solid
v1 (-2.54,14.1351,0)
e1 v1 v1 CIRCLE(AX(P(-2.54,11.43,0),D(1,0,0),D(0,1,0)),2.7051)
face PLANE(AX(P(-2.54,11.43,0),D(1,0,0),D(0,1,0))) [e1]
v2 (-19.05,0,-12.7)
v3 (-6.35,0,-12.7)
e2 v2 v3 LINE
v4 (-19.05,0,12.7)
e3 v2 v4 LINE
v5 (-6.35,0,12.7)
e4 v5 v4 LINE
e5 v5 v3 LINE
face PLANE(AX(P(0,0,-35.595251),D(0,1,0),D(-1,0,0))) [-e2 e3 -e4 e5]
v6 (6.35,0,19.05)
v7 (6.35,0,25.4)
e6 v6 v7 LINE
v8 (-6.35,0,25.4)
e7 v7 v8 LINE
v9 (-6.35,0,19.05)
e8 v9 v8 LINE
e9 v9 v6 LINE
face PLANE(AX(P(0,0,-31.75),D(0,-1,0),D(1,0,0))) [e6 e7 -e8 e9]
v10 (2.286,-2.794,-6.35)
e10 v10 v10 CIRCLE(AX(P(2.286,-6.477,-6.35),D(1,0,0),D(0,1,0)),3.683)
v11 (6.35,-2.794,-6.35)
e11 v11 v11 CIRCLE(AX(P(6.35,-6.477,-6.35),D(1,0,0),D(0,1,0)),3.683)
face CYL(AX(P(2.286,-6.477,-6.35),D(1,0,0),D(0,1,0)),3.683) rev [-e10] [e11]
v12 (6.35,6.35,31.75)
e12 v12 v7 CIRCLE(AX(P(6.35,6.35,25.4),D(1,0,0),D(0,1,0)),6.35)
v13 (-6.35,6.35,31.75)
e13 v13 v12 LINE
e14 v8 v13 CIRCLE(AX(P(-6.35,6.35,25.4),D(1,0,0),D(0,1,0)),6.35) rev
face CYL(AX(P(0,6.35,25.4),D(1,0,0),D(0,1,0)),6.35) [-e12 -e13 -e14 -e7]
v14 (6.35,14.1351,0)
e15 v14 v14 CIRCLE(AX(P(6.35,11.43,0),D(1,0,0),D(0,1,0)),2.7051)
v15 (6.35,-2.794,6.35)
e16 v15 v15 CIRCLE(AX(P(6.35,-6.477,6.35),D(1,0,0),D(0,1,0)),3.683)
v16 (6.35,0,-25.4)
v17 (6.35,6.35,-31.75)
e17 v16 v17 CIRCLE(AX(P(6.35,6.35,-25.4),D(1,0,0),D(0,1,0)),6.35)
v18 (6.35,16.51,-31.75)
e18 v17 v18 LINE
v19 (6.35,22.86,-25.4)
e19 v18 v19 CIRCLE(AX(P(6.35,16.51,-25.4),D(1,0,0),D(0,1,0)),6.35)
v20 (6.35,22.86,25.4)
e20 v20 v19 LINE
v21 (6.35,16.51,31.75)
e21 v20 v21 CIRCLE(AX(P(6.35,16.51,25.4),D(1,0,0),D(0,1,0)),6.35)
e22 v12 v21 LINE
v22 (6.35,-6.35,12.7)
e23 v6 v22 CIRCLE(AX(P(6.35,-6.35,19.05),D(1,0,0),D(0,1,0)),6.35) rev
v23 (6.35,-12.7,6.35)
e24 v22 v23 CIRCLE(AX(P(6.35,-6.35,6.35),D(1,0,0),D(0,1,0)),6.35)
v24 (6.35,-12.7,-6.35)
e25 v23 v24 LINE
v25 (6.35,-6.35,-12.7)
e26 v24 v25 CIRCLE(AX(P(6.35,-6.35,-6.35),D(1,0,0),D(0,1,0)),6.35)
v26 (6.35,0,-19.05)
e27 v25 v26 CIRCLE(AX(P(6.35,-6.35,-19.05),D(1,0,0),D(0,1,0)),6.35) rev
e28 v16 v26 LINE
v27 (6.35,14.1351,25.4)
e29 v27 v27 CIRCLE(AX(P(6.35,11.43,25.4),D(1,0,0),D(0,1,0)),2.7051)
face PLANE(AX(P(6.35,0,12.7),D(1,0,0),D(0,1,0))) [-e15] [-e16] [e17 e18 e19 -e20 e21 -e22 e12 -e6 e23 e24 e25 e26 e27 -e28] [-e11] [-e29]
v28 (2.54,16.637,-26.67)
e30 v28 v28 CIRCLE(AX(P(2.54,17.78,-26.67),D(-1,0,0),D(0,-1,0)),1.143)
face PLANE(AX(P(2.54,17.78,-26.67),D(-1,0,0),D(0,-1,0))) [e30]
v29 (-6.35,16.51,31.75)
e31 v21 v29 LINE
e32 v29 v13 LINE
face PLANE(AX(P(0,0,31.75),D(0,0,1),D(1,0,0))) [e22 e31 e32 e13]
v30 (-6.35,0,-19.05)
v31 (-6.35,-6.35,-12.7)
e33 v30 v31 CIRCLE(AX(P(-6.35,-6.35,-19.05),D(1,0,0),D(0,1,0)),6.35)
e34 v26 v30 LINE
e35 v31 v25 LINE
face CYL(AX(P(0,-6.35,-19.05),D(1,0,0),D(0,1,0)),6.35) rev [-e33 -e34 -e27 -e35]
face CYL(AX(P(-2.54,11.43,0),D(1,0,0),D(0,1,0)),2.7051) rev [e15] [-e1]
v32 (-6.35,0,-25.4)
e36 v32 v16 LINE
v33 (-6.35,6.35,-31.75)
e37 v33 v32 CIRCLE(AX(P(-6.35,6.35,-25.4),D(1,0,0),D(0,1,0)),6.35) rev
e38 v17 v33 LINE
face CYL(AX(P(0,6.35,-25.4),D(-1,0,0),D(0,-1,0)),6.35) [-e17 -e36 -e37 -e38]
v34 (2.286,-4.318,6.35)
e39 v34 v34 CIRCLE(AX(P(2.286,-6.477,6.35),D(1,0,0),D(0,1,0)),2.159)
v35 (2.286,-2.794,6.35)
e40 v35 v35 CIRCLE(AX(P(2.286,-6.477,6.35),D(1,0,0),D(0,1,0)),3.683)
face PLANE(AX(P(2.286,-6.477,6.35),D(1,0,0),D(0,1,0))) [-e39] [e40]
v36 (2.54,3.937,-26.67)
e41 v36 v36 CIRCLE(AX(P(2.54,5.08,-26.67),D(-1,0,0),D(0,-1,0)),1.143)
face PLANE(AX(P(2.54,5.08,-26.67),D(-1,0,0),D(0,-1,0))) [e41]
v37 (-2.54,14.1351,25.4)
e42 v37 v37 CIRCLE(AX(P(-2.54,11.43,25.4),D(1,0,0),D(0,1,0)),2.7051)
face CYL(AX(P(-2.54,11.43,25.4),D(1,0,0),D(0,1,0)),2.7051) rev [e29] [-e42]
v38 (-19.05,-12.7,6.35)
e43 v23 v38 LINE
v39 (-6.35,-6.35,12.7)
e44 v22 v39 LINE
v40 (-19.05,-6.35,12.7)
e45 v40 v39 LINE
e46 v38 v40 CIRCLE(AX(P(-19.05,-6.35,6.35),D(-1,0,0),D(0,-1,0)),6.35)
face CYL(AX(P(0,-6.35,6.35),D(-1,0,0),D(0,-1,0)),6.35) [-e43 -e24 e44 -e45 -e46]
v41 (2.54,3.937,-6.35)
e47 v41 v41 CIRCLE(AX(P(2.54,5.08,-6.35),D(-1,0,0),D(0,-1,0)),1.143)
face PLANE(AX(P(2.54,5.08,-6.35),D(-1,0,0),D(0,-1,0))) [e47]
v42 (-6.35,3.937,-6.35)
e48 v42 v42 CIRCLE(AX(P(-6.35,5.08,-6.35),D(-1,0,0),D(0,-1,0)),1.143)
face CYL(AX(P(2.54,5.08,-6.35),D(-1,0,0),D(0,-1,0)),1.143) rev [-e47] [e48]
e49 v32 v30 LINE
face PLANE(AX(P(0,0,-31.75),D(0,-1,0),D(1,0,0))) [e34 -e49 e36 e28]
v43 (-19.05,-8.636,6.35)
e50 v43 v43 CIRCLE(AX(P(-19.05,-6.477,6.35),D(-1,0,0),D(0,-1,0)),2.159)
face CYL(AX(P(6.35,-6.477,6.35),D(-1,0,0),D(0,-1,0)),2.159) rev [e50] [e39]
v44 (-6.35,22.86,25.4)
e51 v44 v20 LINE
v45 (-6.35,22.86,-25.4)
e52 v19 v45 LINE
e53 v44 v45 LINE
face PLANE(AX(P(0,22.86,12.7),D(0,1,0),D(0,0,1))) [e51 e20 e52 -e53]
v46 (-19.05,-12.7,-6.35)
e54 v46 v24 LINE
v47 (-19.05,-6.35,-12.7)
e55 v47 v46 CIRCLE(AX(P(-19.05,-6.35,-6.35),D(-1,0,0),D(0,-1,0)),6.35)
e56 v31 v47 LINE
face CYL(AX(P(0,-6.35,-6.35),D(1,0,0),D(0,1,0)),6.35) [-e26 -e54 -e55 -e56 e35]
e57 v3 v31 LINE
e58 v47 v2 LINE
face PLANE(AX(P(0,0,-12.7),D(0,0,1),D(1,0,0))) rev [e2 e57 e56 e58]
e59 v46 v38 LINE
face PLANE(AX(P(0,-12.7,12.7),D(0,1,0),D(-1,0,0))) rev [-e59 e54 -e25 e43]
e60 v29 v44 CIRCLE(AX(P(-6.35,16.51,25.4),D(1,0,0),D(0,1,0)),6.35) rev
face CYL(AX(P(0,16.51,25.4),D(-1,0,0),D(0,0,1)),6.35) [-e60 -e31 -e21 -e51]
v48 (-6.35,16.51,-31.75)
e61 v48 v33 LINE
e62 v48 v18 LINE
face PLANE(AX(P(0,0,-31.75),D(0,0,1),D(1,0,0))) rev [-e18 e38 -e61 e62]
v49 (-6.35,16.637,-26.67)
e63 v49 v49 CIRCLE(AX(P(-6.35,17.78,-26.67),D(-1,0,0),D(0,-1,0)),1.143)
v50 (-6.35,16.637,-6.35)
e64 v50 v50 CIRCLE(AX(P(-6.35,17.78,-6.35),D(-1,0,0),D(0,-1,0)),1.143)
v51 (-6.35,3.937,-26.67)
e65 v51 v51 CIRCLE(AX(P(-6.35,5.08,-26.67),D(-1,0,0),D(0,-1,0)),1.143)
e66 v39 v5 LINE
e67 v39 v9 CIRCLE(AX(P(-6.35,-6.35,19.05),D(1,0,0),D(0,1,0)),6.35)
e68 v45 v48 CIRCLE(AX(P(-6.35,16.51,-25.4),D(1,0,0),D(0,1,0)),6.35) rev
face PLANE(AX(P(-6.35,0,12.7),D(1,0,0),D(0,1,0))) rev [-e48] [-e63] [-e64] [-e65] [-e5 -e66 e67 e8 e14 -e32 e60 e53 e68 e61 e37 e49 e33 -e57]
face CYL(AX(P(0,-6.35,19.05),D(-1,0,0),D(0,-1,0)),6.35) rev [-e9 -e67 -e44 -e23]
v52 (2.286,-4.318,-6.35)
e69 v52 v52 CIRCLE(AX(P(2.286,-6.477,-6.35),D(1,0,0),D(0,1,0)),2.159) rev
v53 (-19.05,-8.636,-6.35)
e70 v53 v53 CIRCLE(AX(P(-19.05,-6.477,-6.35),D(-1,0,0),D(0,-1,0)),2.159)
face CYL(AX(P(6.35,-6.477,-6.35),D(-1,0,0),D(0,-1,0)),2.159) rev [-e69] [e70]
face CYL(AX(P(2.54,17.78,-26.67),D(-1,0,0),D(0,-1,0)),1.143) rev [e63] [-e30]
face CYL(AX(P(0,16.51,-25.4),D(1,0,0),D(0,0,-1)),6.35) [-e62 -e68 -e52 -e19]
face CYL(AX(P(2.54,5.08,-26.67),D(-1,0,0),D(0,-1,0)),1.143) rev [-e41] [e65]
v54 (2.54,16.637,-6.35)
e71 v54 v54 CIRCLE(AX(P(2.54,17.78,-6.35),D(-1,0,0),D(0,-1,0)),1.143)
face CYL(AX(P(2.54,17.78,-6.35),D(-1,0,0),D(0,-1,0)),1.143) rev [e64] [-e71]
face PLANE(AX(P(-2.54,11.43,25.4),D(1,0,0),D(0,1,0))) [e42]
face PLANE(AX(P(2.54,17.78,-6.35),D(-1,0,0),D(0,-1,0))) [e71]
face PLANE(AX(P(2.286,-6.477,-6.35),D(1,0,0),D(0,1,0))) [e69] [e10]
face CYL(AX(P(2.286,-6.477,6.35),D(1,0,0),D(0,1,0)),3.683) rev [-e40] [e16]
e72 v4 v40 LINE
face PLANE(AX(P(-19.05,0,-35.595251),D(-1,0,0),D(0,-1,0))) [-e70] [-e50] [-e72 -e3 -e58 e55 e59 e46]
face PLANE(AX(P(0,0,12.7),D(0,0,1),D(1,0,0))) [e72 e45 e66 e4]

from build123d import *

# Parameters (mm, degrees)
PROFILE_W                = 12.7
PROFILE_H                = 22.86
PROFILE_W_2              = 6.35
PROFILE_H_2              = 12.7
BOSS_EXTRUDE1_DEPTH      = 12.7
SKETCH7_W                = 19.05
SKETCH7_H                = 12.7
BOSS_EXTRUDE2_DEPTH      = 25.4
CUT_EXTRUDE1_DEPTH       = 37.45585824
CUT_EXTRUDE1_DEPTH_BACK  = 37.45585824
SCREWHOLE_R              = 2.159
CUT_EXTRUDE2_START       = -4.064
SKETCH3_R                = 3.683
SKETCH3_R_2              = 2.159
CUT_EXTRUDE2_DEPTH       = 4.064
BOSS_EXTRUDE4_DEPTH      = 31.75
BOSS_EXTRUDE4_DEPTH_BACK = 31.75
SKETCH11_W               = 12.7
SKETCH11_H               = 22.86
SKETCH14_R               = 2.7051
CUT_EXTRUDE3_DEPTH       = 8.89
SKETCH13_R               = 1.143
CUT_EXTRUDE4_DEPTH       = 8.89
FILLET1_R                = 6.35


with BuildPart() as part:
    # Profile → Boss-Extrude1 (new, symmetric)
    with BuildSketch(Plane.XY):
        with Locations((0, 11.43)):
            Rectangle(PROFILE_W, PROFILE_H)
        with Locations((3.175, -6.35)):
            Rectangle(PROFILE_W_2, PROFILE_H_2)
    extrude(amount=BOSS_EXTRUDE1_DEPTH, both=True)

    # Sketch7 → Boss-Extrude2 (add)
    with BuildSketch(Plane.XY.offset(12.7)):
        with Locations((-9.525, -6.35)):
            Rectangle(SKETCH7_W, SKETCH7_H)
    extrude(amount=-BOSS_EXTRUDE2_DEPTH)

    # ScrewHole → Cut-Extrude1 (cut, two sides: drawn at the far end of the back side and taken through both)
    with BuildSketch(Plane.ZY.offset(19.05).offset(-CUT_EXTRUDE1_DEPTH_BACK)):
        with Locations(Location((6.35, -6.477, 0), (0, 0, 270))):
            Circle(SCREWHOLE_R)
        with Locations(Location((-6.35, -6.477, 0), (0, 0, 270))):
            Circle(SCREWHOLE_R)
    extrude(amount=CUT_EXTRUDE1_DEPTH + CUT_EXTRUDE1_DEPTH_BACK, mode=Mode.SUBTRACT)

    # Sketch3 → Cut-Extrude2 (cut)
    # profile 1 of 2: a face of its own
    with BuildSketch(Plane(origin=(6.35, 0, 0), x_dir=(0, 0, -1), z_dir=(1, 0, 0)).offset(CUT_EXTRUDE2_START)):
        with Locations(Location((-6.35, -6.477, 0), (0, 0, 90))):
            Circle(SKETCH3_R)
        with Locations(Location((-6.35, -6.477, 0), (0, 0, 270))):
            Circle(SKETCH3_R_2, mode=Mode.SUBTRACT)
    # profile 2 of 2: a face of its own
    with BuildSketch(Plane(origin=(6.35, 0, 0), x_dir=(0, 0, -1), z_dir=(1, 0, 0)).offset(CUT_EXTRUDE2_START)):
        with Locations(Location((6.35, -6.477, 0), (0, 0, 90))):
            Circle(SKETCH3_R)
    extrude(amount=CUT_EXTRUDE2_DEPTH, mode=Mode.SUBTRACT)

    # Sketch11 → Boss-Extrude4 (add, two sides: drawn at the far end of the back side and taken through both)
    with BuildSketch(Plane.XY.offset(-BOSS_EXTRUDE4_DEPTH_BACK)):
        with Locations((0, 11.43)):
            Rectangle(SKETCH11_W, SKETCH11_H)
    extrude(amount=BOSS_EXTRUDE4_DEPTH + BOSS_EXTRUDE4_DEPTH_BACK)

    # Sketch14 → Cut-Extrude3 (cut)
    with BuildSketch(Plane(origin=(6.35, 0, 0), x_dir=(0, 0, -1), z_dir=(1, 0, 0))):
        with Locations(Location((-25.4, 11.43, 0), (0, 0, 90))):
            Circle(SKETCH14_R)
        with Locations(Location((0, 11.43, 0), (0, 0, 90))):
            Circle(SKETCH14_R)
    extrude(amount=-CUT_EXTRUDE3_DEPTH, mode=Mode.SUBTRACT)

    # Sketch13 → Cut-Extrude4 (cut)
    with BuildSketch(Plane.ZY.offset(6.35)):
        with Locations(Location((-26.67, 17.78, 0), (0, 0, 270))):
            Circle(SKETCH13_R)
        with Locations(Location((-6.35, 17.78, 0), (0, 0, 270))):
            Circle(SKETCH13_R)
        with Locations(Location((-6.35, 5.08, 0), (0, 0, 270))):
            Circle(SKETCH13_R)
        with Locations(Location((-26.67, 5.08, 0), (0, 0, 270))):
            Circle(SKETCH13_R)
    extrude(amount=-CUT_EXTRUDE4_DEPTH, mode=Mode.SUBTRACT)

    # Fillet1
    fillet1_edges = [part.edges().sort_by_distance(p)[0] for p in [
        (-6.35, -12.7, -12.7),
        (-6.35, -12.7, 12.7),
        (0, 0, 31.75),
        (0, 22.86, 31.75),
        (0, 22.86, -31.75),
        (0, 0, -31.75),
        (0, 0, -12.7),
        (0, 0, 12.7),
    ]]
    fillet(fillet1_edges, radius=FILLET1_R - 0.0001)  # a hair under: the kernel refuses the full size


solid = part.part
